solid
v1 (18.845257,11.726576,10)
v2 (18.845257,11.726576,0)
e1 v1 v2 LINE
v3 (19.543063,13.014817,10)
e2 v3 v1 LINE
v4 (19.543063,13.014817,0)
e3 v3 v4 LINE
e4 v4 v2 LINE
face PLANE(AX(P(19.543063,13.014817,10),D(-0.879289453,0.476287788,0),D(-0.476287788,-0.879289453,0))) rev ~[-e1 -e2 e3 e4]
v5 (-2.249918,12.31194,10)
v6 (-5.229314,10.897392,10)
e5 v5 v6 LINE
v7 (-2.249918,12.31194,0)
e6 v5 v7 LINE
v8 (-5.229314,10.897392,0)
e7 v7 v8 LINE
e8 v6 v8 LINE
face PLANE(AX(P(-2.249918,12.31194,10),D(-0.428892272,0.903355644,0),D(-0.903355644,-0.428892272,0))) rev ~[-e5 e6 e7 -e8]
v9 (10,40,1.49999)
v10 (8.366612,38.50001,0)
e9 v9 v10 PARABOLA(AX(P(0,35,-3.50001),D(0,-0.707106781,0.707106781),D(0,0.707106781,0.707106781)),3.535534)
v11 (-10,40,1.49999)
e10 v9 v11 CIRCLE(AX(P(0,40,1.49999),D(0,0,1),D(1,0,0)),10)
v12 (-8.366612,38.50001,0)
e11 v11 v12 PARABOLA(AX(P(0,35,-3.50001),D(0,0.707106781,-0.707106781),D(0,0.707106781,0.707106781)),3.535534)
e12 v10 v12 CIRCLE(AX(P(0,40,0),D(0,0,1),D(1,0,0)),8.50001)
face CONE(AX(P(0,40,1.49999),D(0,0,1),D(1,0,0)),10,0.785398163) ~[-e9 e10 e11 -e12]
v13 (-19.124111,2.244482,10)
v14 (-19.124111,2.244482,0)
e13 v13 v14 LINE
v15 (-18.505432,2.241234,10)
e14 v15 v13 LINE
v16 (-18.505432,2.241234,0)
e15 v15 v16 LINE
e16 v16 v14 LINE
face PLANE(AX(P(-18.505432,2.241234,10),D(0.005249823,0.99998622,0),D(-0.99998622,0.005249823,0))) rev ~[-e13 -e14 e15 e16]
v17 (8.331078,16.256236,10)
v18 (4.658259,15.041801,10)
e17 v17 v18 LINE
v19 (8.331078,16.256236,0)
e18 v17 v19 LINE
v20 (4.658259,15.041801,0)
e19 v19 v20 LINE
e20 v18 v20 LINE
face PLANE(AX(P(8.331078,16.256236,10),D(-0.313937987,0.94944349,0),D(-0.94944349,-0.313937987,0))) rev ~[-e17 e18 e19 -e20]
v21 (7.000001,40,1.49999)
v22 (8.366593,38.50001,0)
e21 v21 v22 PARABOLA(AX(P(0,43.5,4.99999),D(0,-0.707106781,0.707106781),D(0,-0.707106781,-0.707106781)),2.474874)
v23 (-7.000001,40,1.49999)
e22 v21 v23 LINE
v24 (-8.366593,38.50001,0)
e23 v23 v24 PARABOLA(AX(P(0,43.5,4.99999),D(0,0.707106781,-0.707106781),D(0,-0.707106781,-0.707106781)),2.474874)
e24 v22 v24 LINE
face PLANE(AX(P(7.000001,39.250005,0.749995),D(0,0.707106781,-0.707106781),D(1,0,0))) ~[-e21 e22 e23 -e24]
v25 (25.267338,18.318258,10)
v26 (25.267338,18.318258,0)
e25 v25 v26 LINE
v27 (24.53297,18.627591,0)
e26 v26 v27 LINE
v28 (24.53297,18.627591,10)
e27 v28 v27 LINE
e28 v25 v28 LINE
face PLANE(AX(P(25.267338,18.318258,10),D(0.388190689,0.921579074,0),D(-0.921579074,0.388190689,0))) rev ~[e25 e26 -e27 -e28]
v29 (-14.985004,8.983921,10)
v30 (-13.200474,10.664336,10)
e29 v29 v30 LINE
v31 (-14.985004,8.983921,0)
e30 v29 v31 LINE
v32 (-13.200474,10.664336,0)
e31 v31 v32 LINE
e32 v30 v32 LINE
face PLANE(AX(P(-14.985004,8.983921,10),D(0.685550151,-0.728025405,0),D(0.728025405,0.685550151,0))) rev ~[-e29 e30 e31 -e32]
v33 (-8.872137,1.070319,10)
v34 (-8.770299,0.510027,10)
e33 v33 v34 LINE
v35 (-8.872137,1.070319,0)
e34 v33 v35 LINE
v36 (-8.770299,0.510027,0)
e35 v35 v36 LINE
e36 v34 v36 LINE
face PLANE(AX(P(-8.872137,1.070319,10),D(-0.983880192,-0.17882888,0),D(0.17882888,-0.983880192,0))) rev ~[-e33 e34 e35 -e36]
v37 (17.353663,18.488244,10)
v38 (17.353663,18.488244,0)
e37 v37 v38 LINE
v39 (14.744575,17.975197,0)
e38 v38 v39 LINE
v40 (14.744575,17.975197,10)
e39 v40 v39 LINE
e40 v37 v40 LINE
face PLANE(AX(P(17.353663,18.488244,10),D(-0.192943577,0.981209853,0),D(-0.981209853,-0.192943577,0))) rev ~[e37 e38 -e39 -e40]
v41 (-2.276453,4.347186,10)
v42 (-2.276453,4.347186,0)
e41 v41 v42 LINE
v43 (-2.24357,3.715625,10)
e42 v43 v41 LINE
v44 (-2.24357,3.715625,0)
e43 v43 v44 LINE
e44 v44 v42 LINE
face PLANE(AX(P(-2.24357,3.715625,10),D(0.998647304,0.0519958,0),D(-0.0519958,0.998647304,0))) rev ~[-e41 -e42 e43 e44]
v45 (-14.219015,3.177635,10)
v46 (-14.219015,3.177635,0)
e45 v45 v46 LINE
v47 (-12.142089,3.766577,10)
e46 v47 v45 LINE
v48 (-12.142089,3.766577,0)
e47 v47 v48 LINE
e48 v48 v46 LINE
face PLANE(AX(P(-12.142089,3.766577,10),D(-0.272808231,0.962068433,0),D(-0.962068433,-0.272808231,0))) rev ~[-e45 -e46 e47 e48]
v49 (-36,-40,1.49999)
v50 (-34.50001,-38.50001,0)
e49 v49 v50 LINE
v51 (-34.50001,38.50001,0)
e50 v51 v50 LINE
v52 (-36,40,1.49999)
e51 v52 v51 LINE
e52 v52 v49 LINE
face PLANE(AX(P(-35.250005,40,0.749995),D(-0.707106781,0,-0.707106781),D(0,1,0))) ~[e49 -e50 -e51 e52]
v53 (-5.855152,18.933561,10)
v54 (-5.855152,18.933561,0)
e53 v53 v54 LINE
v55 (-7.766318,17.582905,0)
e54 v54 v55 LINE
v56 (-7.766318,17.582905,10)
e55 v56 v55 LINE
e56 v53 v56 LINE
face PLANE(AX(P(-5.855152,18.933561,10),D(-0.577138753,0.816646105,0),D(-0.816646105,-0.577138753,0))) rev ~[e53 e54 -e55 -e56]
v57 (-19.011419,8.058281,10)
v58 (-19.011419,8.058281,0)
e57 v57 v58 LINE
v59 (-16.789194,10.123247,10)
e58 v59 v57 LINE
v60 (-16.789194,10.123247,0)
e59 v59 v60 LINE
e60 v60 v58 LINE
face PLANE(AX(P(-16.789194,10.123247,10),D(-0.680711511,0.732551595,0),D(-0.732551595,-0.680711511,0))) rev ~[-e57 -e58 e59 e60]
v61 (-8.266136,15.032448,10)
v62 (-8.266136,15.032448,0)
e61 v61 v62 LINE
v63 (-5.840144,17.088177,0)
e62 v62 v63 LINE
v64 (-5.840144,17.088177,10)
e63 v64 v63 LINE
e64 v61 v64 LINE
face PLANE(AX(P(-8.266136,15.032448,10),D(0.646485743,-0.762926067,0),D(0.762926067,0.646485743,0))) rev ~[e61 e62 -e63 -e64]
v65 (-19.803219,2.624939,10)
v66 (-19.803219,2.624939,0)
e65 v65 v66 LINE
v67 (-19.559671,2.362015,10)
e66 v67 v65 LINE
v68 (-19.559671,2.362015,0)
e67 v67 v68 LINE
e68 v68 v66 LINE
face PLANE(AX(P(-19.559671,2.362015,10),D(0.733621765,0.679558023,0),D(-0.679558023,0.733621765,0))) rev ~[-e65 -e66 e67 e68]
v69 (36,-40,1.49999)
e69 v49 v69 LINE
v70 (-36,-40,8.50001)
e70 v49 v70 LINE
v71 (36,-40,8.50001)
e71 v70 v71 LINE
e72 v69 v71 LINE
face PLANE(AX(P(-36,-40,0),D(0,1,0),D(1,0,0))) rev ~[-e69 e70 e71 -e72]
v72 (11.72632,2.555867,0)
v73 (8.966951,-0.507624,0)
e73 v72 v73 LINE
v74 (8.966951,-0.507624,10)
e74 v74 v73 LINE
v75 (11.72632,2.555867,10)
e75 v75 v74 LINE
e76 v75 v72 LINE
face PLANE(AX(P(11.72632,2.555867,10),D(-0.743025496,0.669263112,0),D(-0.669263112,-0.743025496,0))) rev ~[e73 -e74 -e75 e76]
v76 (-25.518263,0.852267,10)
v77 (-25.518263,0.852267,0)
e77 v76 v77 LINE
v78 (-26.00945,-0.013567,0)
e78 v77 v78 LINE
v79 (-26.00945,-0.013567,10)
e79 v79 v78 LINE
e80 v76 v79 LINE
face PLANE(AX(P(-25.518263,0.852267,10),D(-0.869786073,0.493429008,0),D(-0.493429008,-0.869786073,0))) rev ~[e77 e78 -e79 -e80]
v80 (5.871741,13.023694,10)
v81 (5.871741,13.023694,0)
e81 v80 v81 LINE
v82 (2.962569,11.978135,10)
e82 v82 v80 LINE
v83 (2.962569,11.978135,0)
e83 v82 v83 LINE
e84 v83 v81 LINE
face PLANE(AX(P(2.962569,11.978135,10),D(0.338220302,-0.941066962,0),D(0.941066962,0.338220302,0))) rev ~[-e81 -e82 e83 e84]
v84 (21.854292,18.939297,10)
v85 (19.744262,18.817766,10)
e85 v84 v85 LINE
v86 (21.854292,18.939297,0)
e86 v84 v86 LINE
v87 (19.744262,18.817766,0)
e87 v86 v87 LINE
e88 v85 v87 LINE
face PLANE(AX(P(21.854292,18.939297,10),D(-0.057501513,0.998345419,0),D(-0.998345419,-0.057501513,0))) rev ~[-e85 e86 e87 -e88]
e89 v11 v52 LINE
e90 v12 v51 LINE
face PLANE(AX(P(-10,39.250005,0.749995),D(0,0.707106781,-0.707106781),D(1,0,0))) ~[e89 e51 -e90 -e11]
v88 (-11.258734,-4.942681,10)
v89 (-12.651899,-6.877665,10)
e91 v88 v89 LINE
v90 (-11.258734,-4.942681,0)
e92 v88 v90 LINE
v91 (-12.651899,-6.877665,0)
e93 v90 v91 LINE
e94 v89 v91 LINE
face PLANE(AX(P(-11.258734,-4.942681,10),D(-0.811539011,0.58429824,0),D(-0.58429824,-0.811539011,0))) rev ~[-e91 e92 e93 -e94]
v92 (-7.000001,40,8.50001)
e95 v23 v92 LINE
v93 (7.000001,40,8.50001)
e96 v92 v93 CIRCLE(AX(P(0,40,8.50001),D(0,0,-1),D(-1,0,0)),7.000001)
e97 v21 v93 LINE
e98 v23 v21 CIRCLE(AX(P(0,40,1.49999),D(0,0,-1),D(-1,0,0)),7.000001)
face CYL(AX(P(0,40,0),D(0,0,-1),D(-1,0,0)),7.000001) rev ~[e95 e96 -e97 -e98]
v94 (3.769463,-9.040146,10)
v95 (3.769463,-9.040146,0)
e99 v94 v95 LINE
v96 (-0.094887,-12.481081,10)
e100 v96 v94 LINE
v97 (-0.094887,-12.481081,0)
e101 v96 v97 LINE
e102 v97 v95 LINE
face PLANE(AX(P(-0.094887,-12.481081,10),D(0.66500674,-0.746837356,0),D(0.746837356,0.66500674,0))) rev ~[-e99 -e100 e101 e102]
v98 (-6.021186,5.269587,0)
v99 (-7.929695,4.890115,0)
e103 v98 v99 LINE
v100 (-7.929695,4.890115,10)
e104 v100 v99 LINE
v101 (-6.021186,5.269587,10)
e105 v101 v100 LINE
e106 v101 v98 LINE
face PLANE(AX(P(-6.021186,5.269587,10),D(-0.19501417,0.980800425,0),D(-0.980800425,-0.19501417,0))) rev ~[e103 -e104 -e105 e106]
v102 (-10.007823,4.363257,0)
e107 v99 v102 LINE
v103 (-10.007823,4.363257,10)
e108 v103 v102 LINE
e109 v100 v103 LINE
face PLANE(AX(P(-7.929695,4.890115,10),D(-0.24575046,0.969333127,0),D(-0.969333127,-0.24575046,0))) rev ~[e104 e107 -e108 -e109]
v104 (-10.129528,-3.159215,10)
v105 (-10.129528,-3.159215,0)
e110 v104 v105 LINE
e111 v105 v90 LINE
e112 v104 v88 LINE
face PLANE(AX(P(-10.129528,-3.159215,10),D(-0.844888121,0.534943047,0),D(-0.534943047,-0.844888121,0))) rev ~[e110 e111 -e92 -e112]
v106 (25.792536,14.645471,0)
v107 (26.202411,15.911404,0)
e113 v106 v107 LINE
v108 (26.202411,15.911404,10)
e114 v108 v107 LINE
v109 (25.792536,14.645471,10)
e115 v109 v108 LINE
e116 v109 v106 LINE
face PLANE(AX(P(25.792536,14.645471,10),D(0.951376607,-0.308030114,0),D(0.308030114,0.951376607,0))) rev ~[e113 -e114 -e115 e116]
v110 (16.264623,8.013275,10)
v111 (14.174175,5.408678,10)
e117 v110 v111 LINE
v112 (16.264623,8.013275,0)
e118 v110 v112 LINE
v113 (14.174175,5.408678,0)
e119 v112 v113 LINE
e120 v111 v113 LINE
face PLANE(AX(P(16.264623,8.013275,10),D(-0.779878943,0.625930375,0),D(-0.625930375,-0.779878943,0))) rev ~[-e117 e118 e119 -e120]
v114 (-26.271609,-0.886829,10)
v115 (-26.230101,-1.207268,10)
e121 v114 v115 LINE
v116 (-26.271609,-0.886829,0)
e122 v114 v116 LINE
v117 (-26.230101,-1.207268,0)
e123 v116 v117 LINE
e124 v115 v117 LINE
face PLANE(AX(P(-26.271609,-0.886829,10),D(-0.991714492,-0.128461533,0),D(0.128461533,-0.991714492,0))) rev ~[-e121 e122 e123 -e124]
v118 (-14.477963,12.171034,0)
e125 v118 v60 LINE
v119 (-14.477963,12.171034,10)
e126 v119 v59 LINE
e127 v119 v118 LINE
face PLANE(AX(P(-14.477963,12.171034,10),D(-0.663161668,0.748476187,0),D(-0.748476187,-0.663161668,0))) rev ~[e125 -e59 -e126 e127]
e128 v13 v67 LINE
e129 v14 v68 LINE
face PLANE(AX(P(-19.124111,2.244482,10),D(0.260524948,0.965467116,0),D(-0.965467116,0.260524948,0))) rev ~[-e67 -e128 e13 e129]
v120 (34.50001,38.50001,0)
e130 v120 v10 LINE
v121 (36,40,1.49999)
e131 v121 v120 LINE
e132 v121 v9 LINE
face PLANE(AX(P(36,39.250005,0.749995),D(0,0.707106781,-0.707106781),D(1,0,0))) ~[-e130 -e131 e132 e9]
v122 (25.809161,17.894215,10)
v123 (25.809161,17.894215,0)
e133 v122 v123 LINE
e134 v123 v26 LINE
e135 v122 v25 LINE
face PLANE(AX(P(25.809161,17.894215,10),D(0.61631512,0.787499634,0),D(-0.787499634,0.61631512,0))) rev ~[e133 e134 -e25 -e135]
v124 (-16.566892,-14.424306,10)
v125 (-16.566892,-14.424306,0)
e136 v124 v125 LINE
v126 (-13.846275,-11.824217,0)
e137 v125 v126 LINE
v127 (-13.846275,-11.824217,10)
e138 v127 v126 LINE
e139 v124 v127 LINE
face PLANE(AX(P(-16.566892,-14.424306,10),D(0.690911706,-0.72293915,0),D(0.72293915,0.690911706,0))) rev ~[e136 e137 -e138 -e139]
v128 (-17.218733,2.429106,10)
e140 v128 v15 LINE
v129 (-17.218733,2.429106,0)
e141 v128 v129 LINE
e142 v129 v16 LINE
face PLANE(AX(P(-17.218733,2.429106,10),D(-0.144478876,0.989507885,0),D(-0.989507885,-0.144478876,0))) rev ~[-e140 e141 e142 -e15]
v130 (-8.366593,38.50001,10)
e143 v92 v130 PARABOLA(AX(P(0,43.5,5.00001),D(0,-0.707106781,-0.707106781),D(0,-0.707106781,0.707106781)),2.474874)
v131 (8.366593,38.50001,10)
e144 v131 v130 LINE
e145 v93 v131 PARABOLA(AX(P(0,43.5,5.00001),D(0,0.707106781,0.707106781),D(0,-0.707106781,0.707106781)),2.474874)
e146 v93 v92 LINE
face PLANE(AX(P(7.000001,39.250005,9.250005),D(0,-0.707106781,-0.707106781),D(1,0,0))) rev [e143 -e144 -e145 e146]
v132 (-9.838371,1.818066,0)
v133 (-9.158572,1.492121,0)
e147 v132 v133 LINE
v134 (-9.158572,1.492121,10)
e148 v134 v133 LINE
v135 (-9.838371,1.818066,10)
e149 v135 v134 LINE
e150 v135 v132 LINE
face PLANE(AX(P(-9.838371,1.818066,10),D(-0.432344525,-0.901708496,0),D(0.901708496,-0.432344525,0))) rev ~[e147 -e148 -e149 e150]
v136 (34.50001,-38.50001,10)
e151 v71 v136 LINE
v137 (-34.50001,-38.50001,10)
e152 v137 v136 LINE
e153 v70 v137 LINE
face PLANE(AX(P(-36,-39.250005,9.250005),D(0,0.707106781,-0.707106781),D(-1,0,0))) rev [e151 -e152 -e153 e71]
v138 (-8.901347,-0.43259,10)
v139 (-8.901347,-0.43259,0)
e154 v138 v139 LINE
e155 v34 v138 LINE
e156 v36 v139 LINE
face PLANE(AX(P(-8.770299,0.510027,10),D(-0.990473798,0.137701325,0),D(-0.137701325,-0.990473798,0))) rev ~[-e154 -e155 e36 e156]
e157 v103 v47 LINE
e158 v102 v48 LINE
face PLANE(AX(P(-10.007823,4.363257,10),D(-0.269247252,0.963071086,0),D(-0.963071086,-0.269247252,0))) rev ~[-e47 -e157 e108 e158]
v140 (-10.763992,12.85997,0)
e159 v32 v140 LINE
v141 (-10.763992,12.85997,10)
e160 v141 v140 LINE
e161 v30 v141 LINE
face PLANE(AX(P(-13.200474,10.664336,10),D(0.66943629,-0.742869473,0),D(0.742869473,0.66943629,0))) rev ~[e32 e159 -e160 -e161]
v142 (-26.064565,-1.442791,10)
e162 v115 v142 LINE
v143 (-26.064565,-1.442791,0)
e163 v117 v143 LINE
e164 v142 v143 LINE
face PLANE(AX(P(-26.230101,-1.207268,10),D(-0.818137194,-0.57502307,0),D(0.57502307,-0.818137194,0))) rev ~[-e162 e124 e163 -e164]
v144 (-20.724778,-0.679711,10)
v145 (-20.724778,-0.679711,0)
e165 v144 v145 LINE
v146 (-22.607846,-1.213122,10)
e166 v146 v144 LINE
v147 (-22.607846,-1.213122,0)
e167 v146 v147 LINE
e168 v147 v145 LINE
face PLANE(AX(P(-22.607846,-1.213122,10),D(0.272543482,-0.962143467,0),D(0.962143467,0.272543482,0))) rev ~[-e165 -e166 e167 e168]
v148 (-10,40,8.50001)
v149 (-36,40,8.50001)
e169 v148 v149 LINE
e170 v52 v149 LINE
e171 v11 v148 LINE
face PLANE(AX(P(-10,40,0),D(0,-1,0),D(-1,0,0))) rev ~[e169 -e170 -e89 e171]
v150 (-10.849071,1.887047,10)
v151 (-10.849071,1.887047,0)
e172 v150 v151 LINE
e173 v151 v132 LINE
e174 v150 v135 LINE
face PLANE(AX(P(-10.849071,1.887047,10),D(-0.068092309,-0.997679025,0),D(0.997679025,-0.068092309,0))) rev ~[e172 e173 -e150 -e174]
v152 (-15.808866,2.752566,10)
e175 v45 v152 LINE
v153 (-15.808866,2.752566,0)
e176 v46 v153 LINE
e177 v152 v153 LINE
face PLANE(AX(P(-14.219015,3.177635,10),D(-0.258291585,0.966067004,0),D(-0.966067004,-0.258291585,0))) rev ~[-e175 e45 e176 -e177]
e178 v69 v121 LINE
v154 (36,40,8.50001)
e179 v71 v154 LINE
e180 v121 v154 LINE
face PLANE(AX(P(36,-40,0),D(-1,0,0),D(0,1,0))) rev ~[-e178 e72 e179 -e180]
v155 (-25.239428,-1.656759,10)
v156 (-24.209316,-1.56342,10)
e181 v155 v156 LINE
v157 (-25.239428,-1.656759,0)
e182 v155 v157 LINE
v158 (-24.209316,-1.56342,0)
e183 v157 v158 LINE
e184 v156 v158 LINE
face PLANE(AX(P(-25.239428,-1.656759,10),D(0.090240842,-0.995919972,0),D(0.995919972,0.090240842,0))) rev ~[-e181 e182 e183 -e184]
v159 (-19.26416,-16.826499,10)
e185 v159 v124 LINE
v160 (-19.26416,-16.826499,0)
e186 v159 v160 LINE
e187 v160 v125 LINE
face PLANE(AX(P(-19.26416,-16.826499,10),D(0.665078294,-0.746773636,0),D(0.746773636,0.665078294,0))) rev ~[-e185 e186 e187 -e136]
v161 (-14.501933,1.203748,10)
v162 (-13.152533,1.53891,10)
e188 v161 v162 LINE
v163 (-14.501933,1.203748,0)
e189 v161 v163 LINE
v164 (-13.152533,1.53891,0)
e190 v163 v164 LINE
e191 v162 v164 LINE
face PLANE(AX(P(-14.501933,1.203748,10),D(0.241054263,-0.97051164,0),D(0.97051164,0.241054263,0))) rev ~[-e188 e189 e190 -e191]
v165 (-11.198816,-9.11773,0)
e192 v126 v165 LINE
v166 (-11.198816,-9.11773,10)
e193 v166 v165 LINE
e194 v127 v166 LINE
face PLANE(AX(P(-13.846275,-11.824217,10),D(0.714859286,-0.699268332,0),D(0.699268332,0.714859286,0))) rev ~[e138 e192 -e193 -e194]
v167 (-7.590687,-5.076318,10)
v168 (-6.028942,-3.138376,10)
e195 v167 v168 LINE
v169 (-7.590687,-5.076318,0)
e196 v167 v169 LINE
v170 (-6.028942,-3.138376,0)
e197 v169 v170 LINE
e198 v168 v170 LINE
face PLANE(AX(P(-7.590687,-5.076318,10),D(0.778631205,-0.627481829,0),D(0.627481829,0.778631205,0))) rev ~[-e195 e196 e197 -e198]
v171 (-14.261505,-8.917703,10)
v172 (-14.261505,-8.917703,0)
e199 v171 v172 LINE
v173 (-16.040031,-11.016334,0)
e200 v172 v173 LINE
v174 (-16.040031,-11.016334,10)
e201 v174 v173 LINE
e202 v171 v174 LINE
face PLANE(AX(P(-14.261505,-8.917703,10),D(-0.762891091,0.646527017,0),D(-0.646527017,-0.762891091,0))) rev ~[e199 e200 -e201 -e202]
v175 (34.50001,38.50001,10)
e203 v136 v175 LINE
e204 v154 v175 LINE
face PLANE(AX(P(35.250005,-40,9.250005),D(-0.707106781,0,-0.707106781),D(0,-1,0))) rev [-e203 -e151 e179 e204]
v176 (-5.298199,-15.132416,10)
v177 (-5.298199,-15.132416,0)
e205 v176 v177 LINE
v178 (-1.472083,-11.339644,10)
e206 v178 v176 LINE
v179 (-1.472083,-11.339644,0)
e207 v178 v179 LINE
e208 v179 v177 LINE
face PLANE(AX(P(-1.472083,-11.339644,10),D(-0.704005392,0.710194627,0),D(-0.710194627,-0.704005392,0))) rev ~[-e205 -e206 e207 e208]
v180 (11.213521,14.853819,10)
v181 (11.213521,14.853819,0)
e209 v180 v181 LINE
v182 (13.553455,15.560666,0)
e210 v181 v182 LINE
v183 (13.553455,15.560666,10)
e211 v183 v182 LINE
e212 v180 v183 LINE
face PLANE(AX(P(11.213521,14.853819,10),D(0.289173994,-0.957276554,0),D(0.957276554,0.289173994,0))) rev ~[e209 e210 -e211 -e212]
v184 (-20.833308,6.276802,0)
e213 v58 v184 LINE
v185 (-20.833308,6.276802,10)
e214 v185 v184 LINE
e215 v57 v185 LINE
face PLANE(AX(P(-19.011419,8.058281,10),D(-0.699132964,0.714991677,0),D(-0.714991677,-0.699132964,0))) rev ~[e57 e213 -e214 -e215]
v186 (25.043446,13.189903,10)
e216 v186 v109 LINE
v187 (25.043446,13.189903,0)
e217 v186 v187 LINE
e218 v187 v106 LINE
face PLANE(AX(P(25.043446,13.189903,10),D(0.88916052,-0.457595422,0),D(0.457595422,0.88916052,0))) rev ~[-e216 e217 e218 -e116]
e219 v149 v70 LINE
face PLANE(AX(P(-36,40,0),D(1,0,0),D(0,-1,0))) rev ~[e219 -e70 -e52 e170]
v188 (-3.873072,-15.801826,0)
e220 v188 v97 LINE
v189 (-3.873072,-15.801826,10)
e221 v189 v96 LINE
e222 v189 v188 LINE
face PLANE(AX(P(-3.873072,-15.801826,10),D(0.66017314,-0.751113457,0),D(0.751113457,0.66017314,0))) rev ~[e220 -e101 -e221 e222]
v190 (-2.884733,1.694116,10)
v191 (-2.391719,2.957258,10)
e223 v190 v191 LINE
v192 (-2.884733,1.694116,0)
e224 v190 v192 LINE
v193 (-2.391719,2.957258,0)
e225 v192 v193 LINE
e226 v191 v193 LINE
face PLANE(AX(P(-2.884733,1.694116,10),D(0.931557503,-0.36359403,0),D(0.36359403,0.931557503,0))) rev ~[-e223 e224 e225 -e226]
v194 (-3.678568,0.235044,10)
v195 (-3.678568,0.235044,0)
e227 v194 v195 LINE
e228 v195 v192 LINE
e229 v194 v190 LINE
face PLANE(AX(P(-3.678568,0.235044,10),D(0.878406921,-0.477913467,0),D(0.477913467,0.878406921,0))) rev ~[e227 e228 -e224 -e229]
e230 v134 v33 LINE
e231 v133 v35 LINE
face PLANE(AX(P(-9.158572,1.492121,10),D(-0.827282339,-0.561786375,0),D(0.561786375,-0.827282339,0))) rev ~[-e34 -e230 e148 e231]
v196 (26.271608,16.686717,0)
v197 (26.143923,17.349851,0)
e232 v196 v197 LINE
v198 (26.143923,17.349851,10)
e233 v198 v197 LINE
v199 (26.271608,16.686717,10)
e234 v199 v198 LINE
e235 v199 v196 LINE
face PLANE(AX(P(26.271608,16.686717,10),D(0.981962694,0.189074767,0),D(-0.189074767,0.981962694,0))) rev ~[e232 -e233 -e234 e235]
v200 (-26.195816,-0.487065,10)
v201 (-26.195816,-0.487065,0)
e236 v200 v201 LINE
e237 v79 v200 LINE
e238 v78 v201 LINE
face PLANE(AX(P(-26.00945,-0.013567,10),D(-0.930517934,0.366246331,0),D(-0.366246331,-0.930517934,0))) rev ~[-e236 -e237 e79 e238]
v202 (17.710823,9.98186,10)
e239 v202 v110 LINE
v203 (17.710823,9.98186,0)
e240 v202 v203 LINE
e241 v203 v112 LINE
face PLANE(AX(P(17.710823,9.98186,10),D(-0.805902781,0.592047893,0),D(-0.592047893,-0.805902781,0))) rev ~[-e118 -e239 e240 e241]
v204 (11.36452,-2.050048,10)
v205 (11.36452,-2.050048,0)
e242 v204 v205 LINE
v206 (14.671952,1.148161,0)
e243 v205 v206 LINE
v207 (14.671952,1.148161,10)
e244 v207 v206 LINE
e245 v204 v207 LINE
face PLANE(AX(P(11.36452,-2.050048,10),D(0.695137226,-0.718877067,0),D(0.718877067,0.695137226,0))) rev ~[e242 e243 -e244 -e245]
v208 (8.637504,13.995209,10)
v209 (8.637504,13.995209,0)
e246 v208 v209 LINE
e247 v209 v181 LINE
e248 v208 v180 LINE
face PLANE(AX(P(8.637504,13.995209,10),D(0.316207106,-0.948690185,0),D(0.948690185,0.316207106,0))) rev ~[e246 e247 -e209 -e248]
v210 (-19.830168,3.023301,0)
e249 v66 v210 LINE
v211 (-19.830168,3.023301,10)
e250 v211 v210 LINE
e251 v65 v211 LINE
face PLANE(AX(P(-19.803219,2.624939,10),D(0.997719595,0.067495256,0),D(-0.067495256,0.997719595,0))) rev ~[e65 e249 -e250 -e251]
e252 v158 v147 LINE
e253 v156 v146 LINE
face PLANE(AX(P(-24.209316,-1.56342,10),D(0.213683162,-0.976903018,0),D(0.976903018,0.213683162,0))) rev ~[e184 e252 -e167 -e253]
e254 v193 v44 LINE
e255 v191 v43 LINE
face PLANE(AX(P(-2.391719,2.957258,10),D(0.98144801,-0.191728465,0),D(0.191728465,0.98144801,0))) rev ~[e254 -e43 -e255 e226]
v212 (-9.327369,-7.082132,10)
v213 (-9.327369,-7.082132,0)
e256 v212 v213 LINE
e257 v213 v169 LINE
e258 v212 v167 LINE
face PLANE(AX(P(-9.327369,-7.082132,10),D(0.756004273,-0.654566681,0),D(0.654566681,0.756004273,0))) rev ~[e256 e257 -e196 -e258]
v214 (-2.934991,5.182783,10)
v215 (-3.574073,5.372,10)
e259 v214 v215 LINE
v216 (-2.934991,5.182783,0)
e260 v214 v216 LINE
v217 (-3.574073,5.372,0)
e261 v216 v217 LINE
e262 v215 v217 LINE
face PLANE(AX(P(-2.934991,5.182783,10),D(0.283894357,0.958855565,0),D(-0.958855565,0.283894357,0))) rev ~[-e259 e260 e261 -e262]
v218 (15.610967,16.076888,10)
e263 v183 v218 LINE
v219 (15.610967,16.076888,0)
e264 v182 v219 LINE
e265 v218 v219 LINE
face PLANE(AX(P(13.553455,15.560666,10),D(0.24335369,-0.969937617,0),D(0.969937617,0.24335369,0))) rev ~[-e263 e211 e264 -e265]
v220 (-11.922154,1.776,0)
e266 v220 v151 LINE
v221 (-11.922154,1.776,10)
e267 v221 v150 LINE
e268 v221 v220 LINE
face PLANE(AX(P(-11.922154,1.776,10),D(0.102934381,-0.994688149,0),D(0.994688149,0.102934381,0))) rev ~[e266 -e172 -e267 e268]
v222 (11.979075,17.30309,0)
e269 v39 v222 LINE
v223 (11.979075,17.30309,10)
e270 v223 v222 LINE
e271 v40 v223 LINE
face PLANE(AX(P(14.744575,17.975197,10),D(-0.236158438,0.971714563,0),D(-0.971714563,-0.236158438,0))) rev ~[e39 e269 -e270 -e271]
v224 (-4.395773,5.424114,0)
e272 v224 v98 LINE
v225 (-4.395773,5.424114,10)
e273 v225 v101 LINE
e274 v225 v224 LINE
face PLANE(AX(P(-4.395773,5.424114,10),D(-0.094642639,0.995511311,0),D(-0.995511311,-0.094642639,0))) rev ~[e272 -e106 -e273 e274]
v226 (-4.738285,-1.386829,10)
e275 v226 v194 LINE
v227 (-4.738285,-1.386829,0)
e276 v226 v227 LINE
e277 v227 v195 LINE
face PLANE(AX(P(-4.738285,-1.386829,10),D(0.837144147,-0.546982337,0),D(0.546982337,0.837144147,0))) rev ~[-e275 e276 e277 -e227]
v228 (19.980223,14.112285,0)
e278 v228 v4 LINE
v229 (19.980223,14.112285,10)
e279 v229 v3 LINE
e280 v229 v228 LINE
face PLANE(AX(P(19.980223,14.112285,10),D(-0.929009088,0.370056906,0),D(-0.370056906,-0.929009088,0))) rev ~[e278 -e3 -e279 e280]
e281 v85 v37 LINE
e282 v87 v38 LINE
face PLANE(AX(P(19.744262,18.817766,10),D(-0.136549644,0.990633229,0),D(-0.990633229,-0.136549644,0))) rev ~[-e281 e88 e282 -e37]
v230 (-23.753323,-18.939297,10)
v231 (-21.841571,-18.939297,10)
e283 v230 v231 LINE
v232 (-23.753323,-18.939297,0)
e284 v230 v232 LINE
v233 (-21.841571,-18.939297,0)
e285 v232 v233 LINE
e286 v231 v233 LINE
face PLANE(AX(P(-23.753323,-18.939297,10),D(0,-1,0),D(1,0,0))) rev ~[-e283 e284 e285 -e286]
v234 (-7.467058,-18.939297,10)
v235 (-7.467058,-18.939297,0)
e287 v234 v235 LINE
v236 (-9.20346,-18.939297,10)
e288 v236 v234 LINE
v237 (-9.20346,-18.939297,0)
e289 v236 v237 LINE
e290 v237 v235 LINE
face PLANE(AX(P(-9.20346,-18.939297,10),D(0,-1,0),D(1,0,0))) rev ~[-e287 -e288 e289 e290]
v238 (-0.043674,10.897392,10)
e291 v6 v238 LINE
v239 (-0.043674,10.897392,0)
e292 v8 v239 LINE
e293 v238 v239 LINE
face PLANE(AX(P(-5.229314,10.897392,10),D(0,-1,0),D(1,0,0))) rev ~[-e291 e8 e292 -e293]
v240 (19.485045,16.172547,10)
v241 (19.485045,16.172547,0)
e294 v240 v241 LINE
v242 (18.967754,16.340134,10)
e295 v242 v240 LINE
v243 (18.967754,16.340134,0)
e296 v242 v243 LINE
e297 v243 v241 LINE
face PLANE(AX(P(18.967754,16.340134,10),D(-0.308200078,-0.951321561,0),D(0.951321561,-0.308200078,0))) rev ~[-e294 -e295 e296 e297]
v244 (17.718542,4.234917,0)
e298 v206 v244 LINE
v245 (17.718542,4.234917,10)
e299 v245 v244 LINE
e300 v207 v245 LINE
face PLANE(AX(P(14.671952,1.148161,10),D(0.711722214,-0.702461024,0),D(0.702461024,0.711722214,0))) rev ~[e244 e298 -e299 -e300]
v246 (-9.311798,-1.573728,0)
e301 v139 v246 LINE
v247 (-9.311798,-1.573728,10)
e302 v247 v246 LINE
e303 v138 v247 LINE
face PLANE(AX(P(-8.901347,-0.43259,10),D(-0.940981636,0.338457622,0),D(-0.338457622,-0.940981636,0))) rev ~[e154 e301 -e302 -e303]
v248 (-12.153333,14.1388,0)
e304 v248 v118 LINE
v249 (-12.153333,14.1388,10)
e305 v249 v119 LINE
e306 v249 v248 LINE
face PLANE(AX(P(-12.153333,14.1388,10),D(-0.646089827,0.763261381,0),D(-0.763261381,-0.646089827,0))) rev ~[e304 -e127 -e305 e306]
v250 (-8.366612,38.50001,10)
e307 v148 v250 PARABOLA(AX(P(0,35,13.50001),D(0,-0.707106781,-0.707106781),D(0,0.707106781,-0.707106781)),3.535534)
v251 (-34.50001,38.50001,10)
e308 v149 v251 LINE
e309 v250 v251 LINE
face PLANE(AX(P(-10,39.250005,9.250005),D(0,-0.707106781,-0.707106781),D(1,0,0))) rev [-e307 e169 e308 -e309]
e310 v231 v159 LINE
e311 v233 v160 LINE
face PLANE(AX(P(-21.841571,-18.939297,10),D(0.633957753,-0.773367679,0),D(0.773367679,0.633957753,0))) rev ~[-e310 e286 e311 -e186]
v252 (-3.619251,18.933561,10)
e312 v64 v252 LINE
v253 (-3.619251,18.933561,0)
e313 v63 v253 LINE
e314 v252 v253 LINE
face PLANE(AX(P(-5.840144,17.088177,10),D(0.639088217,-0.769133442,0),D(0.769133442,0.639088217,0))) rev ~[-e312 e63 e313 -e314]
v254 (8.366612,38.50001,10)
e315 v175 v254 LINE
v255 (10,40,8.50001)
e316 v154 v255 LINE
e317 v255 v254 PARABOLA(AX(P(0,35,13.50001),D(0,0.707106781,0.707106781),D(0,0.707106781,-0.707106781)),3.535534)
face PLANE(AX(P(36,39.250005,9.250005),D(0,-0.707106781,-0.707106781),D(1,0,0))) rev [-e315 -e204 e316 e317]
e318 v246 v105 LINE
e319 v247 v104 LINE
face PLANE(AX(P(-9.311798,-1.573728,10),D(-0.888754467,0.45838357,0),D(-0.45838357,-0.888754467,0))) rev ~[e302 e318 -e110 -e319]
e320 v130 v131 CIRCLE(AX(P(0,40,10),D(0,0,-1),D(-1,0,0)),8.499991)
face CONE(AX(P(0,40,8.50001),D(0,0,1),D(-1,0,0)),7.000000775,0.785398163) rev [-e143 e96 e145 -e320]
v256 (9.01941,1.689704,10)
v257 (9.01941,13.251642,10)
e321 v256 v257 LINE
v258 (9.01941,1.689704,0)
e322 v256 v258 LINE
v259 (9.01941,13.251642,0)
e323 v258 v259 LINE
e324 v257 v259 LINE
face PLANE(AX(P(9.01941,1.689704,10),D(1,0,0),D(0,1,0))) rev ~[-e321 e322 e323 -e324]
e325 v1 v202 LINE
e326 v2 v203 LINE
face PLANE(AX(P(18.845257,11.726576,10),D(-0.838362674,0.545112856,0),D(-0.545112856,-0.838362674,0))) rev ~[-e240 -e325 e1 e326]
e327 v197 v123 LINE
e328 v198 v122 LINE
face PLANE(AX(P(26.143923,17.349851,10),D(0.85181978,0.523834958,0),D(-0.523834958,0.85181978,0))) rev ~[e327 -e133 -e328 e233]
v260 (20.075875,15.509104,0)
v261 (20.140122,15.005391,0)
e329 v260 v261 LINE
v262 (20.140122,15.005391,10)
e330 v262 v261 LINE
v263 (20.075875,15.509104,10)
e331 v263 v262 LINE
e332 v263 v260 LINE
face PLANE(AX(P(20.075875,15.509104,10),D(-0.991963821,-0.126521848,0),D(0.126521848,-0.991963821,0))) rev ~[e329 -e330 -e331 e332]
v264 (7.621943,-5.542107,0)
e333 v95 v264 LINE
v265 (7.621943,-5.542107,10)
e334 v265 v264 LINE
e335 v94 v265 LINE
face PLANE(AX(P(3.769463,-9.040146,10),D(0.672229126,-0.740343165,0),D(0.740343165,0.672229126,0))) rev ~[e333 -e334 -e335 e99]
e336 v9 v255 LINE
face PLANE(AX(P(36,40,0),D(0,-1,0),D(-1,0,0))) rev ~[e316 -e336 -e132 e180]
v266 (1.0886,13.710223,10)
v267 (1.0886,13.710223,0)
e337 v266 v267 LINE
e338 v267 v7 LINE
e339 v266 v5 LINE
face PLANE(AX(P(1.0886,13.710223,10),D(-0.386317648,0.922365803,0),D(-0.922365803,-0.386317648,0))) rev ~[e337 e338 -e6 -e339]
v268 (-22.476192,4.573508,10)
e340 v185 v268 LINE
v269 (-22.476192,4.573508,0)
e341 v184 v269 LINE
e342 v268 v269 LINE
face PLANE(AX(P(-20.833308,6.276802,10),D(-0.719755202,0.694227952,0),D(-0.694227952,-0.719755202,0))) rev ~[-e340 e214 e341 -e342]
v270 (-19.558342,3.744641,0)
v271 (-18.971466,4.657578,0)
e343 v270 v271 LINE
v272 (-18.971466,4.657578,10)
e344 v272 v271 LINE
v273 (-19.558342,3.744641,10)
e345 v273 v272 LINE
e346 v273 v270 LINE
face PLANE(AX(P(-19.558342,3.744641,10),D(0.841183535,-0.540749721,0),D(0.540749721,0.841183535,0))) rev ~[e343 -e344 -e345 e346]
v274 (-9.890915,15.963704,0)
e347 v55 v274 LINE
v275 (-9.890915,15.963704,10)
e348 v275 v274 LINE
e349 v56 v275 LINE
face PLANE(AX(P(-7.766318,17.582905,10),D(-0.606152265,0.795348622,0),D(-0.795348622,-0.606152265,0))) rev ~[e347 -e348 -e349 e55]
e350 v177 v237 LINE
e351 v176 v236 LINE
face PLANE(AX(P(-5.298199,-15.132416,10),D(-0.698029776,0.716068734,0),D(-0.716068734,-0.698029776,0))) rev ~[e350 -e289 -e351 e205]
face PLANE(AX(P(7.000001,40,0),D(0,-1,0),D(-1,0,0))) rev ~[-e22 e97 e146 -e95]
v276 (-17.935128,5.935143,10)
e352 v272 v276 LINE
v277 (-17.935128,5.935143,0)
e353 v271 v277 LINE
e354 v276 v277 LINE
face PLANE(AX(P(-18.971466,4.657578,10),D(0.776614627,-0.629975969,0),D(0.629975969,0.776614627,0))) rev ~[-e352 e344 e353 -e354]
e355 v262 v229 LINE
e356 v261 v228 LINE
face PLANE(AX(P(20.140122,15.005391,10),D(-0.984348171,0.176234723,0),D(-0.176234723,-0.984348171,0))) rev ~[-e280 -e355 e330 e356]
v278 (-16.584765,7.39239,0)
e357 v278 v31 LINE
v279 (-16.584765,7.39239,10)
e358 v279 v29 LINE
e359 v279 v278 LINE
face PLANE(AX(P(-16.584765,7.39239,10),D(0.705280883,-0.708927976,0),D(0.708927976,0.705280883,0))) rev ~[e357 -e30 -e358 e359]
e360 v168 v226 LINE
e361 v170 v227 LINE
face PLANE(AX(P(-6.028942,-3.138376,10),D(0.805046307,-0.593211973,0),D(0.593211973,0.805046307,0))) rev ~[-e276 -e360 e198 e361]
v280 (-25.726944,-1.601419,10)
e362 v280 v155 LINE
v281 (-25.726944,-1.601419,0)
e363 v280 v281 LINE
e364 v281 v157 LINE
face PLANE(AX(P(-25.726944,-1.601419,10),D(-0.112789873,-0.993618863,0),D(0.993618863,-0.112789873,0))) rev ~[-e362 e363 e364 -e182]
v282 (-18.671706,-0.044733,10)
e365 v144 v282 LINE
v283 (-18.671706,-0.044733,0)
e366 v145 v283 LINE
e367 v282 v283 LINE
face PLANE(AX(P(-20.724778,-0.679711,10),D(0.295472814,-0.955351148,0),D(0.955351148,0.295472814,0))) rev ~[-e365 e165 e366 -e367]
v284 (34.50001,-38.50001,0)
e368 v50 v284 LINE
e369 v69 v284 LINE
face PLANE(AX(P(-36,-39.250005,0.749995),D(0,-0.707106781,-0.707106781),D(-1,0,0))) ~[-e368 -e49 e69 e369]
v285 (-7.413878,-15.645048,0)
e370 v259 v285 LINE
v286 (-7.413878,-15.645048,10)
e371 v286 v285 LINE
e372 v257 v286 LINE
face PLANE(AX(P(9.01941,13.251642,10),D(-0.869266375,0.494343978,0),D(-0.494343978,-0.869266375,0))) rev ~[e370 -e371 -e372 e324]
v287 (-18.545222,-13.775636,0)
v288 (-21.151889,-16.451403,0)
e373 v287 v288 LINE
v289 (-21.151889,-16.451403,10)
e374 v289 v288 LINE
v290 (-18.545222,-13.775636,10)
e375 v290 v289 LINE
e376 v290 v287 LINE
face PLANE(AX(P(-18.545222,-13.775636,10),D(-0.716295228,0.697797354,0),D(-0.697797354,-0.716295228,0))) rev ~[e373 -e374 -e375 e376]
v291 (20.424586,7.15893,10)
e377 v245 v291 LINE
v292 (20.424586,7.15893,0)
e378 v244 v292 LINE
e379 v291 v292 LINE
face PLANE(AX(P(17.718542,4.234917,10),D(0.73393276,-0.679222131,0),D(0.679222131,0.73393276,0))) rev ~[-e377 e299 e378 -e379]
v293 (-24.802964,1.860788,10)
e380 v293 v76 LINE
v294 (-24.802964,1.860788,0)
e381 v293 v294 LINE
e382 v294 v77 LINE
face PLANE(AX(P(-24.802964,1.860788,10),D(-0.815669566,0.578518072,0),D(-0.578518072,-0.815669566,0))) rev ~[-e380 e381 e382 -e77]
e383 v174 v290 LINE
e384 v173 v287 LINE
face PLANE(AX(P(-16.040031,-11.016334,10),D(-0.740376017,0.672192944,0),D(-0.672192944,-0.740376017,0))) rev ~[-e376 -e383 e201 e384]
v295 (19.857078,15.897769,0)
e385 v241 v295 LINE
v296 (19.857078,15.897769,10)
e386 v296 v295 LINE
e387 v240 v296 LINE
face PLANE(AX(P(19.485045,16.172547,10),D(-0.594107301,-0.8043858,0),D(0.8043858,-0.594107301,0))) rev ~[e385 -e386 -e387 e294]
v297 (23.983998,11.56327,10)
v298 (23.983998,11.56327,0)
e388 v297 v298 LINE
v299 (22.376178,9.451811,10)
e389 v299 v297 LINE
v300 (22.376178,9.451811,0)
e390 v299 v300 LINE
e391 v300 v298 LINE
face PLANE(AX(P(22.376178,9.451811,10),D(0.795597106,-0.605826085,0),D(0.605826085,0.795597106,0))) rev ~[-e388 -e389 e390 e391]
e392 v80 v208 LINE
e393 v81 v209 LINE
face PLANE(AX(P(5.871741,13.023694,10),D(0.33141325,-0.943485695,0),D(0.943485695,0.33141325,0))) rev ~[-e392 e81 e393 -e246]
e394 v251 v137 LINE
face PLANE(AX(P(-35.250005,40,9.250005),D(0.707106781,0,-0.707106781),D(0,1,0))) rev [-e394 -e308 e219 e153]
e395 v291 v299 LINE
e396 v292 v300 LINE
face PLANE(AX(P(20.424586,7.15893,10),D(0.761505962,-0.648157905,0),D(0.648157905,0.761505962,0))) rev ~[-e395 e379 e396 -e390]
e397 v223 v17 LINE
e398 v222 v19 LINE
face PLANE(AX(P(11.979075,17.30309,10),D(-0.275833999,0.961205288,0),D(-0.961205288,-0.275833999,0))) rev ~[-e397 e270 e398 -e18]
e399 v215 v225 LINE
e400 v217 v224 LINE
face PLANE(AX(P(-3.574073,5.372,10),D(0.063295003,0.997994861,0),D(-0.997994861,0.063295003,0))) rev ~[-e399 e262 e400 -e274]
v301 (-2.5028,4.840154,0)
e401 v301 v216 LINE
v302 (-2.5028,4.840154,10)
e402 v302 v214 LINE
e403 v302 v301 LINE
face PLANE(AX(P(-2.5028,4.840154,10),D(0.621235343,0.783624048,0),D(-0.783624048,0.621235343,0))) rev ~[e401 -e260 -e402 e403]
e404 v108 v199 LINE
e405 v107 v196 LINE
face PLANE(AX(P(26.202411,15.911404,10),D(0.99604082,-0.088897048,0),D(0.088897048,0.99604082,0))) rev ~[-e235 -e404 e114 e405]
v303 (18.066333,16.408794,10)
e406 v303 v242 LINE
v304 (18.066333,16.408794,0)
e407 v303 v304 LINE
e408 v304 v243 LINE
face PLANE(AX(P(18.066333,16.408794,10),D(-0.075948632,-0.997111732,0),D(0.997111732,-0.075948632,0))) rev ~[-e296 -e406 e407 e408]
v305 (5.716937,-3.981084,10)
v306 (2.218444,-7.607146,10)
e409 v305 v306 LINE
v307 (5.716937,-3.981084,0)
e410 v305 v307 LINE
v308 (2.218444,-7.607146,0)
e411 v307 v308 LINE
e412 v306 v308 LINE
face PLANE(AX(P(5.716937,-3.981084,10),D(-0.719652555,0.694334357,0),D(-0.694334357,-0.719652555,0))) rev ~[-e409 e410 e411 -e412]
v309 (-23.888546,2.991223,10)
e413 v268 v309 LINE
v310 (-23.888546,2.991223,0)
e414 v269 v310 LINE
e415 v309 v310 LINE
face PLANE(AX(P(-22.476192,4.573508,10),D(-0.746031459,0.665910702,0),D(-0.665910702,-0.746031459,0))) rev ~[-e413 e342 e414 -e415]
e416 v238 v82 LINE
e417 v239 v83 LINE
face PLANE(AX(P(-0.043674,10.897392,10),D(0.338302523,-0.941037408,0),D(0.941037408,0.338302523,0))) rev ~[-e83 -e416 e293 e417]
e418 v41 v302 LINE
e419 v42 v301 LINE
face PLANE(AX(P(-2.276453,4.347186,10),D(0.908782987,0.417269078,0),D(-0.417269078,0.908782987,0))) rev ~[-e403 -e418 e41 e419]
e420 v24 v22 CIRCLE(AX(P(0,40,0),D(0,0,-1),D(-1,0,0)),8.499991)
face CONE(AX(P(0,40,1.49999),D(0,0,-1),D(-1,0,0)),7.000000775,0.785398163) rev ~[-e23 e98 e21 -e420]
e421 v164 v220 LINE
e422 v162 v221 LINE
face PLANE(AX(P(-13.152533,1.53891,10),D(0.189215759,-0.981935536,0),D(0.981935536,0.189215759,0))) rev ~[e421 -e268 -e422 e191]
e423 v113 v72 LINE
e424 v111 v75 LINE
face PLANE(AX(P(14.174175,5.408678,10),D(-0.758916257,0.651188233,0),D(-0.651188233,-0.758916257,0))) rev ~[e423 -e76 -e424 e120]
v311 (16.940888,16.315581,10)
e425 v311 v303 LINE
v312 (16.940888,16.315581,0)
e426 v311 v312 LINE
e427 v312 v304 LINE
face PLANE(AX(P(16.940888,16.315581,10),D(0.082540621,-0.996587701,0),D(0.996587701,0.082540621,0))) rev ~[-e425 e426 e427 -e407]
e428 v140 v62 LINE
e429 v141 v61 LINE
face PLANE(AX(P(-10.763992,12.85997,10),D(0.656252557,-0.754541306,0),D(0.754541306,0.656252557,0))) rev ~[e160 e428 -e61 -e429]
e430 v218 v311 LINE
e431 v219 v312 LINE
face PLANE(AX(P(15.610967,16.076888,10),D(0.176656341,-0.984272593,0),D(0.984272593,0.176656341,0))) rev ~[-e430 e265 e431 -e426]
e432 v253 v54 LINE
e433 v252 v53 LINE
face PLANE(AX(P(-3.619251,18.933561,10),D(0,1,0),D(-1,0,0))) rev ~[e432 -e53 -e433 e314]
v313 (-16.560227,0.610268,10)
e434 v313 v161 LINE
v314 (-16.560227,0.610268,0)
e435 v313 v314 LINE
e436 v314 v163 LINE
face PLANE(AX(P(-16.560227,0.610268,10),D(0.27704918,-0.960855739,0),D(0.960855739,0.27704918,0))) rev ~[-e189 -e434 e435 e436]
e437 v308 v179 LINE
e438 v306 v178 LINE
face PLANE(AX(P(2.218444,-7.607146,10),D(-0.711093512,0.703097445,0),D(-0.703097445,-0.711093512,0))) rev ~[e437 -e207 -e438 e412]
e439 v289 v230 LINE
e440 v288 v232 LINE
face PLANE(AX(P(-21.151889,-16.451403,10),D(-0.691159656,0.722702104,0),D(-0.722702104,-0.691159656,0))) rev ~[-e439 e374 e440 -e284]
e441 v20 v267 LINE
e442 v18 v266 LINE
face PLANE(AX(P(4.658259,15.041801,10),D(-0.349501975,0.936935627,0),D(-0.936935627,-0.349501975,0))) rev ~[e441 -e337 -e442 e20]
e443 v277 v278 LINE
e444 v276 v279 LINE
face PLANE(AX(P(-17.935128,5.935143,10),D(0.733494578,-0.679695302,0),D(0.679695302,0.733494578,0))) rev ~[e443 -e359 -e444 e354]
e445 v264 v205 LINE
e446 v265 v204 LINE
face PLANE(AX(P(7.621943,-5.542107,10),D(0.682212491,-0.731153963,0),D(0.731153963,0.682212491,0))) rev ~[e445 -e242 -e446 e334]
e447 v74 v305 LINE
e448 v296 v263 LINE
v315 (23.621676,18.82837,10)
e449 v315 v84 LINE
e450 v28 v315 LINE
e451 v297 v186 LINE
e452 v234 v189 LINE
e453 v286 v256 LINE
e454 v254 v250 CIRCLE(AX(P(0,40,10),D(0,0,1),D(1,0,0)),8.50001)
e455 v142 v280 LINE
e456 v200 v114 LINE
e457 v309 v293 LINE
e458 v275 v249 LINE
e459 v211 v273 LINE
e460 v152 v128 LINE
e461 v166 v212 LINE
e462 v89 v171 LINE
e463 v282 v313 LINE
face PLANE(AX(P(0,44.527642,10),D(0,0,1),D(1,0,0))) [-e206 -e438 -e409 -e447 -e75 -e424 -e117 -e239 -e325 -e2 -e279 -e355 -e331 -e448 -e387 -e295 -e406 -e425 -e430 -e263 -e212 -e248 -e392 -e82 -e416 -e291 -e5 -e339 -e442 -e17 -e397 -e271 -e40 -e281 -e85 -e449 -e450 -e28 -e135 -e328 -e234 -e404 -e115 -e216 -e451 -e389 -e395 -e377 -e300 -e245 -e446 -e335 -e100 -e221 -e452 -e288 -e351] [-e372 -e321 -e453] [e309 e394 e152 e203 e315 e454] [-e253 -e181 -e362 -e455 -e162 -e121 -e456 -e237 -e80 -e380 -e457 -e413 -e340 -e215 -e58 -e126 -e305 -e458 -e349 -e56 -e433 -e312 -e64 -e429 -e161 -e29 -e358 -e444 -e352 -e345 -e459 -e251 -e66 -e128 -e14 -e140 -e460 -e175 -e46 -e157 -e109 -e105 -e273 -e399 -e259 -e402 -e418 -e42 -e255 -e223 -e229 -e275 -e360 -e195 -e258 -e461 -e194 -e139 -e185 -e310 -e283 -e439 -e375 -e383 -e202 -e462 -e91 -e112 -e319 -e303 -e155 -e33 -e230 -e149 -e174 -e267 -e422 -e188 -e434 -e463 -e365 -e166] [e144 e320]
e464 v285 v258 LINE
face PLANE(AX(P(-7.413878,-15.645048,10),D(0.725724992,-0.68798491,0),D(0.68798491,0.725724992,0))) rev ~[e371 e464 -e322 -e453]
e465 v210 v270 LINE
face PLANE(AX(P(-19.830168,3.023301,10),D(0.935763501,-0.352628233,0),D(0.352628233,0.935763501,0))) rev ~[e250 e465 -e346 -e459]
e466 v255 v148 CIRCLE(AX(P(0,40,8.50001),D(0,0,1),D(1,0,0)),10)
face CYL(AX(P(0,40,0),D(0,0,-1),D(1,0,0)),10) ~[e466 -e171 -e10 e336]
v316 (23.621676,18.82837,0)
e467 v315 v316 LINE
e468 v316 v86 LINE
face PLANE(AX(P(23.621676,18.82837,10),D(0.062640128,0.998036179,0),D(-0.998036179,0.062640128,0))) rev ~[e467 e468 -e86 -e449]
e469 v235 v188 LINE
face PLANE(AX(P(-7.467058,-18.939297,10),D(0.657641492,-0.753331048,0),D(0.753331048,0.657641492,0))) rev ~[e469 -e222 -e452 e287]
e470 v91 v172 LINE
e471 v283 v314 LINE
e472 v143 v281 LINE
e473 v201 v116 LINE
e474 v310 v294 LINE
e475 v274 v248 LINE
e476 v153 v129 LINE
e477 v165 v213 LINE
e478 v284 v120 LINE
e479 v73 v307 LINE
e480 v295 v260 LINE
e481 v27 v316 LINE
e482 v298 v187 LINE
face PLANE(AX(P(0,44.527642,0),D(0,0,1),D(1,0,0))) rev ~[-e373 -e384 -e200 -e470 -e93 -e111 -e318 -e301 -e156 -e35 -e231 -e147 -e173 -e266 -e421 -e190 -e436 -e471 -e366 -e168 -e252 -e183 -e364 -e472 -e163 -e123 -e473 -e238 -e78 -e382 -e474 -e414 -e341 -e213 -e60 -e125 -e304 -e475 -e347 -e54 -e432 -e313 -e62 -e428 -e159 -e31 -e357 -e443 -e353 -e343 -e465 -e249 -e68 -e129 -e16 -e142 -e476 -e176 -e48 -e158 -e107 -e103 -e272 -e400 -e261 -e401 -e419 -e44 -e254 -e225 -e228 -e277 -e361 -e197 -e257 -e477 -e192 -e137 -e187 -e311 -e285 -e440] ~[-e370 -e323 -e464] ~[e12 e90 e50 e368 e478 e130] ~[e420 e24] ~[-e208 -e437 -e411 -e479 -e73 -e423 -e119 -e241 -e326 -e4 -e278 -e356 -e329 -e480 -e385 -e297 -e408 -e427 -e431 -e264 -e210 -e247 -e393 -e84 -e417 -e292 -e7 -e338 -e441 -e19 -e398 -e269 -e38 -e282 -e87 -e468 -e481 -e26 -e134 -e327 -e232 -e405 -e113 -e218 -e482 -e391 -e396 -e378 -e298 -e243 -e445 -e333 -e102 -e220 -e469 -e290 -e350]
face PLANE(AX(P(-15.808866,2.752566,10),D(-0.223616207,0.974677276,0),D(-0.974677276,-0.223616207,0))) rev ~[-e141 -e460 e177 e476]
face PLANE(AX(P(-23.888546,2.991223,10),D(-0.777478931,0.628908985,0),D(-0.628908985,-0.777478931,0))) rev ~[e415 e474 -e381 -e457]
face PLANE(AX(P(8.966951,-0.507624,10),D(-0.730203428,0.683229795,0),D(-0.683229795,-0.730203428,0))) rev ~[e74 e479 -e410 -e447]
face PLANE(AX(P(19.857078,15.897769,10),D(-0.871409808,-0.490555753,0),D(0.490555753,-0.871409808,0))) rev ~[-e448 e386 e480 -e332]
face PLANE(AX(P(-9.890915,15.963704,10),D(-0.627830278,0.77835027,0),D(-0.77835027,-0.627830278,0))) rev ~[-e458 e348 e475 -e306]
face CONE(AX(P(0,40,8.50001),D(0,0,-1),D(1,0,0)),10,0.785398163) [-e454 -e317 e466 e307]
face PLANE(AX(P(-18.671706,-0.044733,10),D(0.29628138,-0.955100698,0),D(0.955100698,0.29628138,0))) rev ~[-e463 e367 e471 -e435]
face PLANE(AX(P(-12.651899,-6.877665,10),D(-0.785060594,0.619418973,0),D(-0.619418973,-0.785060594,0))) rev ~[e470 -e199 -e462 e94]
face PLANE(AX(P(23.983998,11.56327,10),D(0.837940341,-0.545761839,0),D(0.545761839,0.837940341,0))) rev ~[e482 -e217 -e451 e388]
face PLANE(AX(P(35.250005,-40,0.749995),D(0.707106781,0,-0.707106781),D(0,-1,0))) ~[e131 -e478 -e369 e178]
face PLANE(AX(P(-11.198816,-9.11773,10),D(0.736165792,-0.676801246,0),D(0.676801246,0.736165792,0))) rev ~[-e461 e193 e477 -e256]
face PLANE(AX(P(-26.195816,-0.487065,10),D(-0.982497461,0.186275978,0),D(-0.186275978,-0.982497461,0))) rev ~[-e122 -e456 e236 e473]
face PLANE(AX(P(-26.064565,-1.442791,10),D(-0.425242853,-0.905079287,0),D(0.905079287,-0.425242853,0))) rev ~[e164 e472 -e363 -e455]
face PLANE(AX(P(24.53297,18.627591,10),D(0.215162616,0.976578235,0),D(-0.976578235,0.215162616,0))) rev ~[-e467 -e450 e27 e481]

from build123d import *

# Parameters (mm, degrees)
F1_DEPTH = 10
F2_SIZE  = 1.49999
F4_DEPTH = 10


# Not quite as in the source:
# - a fillet or chamfer is up to 0.001 mm smaller than in the source, because OpenCascade refuses the exact size


with BuildPart() as f1:
    # F0 (on Top) → F1 (new body)
    with BuildSketch(Plane.XY):
        with BuildLine():
            Line((7.0000007749, 40), (10, 40))
            ThreePointArc((10, 40), (0, 50), (-10, 40))
            Line((-10, 40), (-7.0000007749, 40))
            ThreePointArc((-7.0000007749, 40), (0, 47.0000007749), (7.0000007749, 40))
        make_face()
        Polygon((36, -40), (36, 40), (10, 40), (7.0000007749, 40), (-7.0000007749, 40), (-10, 40), (-36, 40), (-36, -40), align=None)
    extrude(amount=F1_DEPTH)

    # F2 (size 1.5 in the source; OpenCascade refuses exactly that, so slightly less here)
    f2_edges = [f1.edges().sort_by_distance(p)[0] for p in [
        (0, 50, 10),
        (-23, 40, 10),
        (-36, 0, 10),
        (0, -40, 10),
        (36, 0, 10),
        (23, 40, 10),
        (0, 47.000001, 10),
        (0, 40, 10),
        (0, 50, 0),
        (-23, 40, 0),
        (-36, 0, 0),
        (0, -40, 0),
        (36, 0, 0),
        (23, 40, 0),
        (0, 47.000001, 0),
        (0, 40, 0),
    ]]
    chamfer(f2_edges, length=F2_SIZE)

    # F3 (on face) → F4 (cut)
    with BuildSketch(Plane.XY.offset(10)):
        Polygon((9.01941, 13.251642), (-7.413878, -15.645048), (9.01941, 1.689704), align=None)
        Polygon((-5.229314, 10.897392), (-0.043674, 10.897392), (2.962569, 11.978135), (5.871741, 13.023694), (8.637504, 13.995209), (11.213521, 14.853819), (13.553455, 15.560666), (15.610967, 16.076888), (16.940888, 16.315581), (18.066333, 16.408794), (18.967754, 16.340134), (19.485045, 16.172547), (19.857078, 15.897769), (20.075875, 15.509104), (20.140122, 15.005391), (19.980223, 14.112285), (19.543063, 13.014817), (18.845257, 11.726576), (17.710823, 9.98186), (16.264623, 8.013275), (14.174175, 5.408678), (11.72632, 2.555867), (8.966951, -0.507624), (5.716937, -3.981084), (2.218444, -7.607146), (-1.472083, -11.339644), (-5.298199, -15.132416), (-9.20346, -18.939297), (-7.467058, -18.939297), (-3.873072, -15.801826), (-0.094887, -12.481081), (3.769463, -9.040146), (7.621943, -5.542107), (11.36452, -2.050048), (14.671952, 1.148161), (17.718542, 4.234917), (20.424586, 7.15893), (22.376178, 9.451811), (23.983998, 11.56327), (25.043446, 13.189903), (25.792536, 14.645471), (26.202411, 15.911404), (26.271608, 16.686717), (26.143923, 17.349851), (25.809161, 17.894215), (25.267338, 18.318258), (24.53297, 18.627591), (23.621676, 18.82837), (21.854292, 18.939297), (19.744262, 18.817766), (17.353663, 18.488244), (14.744575, 17.975197), (11.979075, 17.30309), (8.331078, 16.256236), (4.658259, 15.041801), (1.0886, 13.710223), (-2.249918, 12.31194), align=None)
        Polygon((-5.840144, 17.088177), (-3.619251, 18.933561), (-5.855152, 18.933561), (-7.766318, 17.582905), (-9.890915, 15.963704), (-12.153333, 14.1388), (-14.477963, 12.171034), (-16.789194, 10.123247), (-19.011419, 8.058281), (-20.833308, 6.276802), (-22.476192, 4.573508), (-23.888546, 2.991223), (-24.802964, 1.860788), (-25.518263, 0.852267), (-26.00945, -0.013567), (-26.195816, -0.487065), (-26.271609, -0.886829), (-26.230101, -1.207268), (-26.064565, -1.442791), (-25.726944, -1.601419), (-25.239428, -1.656759), (-24.209316, -1.56342), (-22.607846, -1.213122), (-20.724778, -0.679711), (-18.671706, -0.044733), (-16.560227, 0.610268), (-14.501933, 1.203748), (-13.152533, 1.53891), (-11.922154, 1.776), (-10.849071, 1.887047), (-9.838371, 1.818066), (-9.158572, 1.492121), (-8.872137, 1.070319), (-8.770299, 0.510027), (-8.901347, -0.43259), (-9.311798, -1.573728), (-10.129528, -3.159215), (-11.258734, -4.942681), (-12.651899, -6.877665), (-14.261505, -8.917703), (-16.040031, -11.016334), (-18.545222, -13.775636), (-21.151889, -16.451403), (-23.753323, -18.939297), (-21.841571, -18.939297), (-19.26416, -16.826499), (-16.566892, -14.424306), (-13.846275, -11.824217), (-11.198816, -9.11773), (-9.327369, -7.082132), (-7.590687, -5.076318), (-6.028942, -3.138376), (-4.738285, -1.386829), (-3.678568, 0.235044), (-2.884733, 1.694116), (-2.391719, 2.957258), (-2.24357, 3.715625), (-2.276453, 4.347186), (-2.5028, 4.840154), (-2.934991, 5.182783), (-3.574073, 5.372), (-4.395773, 5.424114), (-6.021186, 5.269587), (-7.929695, 4.890115), (-10.007823, 4.363257), (-12.142089, 3.766577), (-14.219015, 3.177635), (-15.808866, 2.752566), (-17.218733, 2.429106), (-18.505432, 2.241234), (-19.124111, 2.244482), (-19.559671, 2.362015), (-19.803219, 2.624939), (-19.830168, 3.023301), (-19.558342, 3.744641), (-18.971466, 4.657578), (-17.935128, 5.935143), (-16.584765, 7.39239), (-14.985004, 8.983921), (-13.200474, 10.664336), (-10.763992, 12.85997), (-8.266136, 15.032448), align=None)
    extrude(amount=-F4_DEPTH, mode=Mode.SUBTRACT)


solid = f1.part
